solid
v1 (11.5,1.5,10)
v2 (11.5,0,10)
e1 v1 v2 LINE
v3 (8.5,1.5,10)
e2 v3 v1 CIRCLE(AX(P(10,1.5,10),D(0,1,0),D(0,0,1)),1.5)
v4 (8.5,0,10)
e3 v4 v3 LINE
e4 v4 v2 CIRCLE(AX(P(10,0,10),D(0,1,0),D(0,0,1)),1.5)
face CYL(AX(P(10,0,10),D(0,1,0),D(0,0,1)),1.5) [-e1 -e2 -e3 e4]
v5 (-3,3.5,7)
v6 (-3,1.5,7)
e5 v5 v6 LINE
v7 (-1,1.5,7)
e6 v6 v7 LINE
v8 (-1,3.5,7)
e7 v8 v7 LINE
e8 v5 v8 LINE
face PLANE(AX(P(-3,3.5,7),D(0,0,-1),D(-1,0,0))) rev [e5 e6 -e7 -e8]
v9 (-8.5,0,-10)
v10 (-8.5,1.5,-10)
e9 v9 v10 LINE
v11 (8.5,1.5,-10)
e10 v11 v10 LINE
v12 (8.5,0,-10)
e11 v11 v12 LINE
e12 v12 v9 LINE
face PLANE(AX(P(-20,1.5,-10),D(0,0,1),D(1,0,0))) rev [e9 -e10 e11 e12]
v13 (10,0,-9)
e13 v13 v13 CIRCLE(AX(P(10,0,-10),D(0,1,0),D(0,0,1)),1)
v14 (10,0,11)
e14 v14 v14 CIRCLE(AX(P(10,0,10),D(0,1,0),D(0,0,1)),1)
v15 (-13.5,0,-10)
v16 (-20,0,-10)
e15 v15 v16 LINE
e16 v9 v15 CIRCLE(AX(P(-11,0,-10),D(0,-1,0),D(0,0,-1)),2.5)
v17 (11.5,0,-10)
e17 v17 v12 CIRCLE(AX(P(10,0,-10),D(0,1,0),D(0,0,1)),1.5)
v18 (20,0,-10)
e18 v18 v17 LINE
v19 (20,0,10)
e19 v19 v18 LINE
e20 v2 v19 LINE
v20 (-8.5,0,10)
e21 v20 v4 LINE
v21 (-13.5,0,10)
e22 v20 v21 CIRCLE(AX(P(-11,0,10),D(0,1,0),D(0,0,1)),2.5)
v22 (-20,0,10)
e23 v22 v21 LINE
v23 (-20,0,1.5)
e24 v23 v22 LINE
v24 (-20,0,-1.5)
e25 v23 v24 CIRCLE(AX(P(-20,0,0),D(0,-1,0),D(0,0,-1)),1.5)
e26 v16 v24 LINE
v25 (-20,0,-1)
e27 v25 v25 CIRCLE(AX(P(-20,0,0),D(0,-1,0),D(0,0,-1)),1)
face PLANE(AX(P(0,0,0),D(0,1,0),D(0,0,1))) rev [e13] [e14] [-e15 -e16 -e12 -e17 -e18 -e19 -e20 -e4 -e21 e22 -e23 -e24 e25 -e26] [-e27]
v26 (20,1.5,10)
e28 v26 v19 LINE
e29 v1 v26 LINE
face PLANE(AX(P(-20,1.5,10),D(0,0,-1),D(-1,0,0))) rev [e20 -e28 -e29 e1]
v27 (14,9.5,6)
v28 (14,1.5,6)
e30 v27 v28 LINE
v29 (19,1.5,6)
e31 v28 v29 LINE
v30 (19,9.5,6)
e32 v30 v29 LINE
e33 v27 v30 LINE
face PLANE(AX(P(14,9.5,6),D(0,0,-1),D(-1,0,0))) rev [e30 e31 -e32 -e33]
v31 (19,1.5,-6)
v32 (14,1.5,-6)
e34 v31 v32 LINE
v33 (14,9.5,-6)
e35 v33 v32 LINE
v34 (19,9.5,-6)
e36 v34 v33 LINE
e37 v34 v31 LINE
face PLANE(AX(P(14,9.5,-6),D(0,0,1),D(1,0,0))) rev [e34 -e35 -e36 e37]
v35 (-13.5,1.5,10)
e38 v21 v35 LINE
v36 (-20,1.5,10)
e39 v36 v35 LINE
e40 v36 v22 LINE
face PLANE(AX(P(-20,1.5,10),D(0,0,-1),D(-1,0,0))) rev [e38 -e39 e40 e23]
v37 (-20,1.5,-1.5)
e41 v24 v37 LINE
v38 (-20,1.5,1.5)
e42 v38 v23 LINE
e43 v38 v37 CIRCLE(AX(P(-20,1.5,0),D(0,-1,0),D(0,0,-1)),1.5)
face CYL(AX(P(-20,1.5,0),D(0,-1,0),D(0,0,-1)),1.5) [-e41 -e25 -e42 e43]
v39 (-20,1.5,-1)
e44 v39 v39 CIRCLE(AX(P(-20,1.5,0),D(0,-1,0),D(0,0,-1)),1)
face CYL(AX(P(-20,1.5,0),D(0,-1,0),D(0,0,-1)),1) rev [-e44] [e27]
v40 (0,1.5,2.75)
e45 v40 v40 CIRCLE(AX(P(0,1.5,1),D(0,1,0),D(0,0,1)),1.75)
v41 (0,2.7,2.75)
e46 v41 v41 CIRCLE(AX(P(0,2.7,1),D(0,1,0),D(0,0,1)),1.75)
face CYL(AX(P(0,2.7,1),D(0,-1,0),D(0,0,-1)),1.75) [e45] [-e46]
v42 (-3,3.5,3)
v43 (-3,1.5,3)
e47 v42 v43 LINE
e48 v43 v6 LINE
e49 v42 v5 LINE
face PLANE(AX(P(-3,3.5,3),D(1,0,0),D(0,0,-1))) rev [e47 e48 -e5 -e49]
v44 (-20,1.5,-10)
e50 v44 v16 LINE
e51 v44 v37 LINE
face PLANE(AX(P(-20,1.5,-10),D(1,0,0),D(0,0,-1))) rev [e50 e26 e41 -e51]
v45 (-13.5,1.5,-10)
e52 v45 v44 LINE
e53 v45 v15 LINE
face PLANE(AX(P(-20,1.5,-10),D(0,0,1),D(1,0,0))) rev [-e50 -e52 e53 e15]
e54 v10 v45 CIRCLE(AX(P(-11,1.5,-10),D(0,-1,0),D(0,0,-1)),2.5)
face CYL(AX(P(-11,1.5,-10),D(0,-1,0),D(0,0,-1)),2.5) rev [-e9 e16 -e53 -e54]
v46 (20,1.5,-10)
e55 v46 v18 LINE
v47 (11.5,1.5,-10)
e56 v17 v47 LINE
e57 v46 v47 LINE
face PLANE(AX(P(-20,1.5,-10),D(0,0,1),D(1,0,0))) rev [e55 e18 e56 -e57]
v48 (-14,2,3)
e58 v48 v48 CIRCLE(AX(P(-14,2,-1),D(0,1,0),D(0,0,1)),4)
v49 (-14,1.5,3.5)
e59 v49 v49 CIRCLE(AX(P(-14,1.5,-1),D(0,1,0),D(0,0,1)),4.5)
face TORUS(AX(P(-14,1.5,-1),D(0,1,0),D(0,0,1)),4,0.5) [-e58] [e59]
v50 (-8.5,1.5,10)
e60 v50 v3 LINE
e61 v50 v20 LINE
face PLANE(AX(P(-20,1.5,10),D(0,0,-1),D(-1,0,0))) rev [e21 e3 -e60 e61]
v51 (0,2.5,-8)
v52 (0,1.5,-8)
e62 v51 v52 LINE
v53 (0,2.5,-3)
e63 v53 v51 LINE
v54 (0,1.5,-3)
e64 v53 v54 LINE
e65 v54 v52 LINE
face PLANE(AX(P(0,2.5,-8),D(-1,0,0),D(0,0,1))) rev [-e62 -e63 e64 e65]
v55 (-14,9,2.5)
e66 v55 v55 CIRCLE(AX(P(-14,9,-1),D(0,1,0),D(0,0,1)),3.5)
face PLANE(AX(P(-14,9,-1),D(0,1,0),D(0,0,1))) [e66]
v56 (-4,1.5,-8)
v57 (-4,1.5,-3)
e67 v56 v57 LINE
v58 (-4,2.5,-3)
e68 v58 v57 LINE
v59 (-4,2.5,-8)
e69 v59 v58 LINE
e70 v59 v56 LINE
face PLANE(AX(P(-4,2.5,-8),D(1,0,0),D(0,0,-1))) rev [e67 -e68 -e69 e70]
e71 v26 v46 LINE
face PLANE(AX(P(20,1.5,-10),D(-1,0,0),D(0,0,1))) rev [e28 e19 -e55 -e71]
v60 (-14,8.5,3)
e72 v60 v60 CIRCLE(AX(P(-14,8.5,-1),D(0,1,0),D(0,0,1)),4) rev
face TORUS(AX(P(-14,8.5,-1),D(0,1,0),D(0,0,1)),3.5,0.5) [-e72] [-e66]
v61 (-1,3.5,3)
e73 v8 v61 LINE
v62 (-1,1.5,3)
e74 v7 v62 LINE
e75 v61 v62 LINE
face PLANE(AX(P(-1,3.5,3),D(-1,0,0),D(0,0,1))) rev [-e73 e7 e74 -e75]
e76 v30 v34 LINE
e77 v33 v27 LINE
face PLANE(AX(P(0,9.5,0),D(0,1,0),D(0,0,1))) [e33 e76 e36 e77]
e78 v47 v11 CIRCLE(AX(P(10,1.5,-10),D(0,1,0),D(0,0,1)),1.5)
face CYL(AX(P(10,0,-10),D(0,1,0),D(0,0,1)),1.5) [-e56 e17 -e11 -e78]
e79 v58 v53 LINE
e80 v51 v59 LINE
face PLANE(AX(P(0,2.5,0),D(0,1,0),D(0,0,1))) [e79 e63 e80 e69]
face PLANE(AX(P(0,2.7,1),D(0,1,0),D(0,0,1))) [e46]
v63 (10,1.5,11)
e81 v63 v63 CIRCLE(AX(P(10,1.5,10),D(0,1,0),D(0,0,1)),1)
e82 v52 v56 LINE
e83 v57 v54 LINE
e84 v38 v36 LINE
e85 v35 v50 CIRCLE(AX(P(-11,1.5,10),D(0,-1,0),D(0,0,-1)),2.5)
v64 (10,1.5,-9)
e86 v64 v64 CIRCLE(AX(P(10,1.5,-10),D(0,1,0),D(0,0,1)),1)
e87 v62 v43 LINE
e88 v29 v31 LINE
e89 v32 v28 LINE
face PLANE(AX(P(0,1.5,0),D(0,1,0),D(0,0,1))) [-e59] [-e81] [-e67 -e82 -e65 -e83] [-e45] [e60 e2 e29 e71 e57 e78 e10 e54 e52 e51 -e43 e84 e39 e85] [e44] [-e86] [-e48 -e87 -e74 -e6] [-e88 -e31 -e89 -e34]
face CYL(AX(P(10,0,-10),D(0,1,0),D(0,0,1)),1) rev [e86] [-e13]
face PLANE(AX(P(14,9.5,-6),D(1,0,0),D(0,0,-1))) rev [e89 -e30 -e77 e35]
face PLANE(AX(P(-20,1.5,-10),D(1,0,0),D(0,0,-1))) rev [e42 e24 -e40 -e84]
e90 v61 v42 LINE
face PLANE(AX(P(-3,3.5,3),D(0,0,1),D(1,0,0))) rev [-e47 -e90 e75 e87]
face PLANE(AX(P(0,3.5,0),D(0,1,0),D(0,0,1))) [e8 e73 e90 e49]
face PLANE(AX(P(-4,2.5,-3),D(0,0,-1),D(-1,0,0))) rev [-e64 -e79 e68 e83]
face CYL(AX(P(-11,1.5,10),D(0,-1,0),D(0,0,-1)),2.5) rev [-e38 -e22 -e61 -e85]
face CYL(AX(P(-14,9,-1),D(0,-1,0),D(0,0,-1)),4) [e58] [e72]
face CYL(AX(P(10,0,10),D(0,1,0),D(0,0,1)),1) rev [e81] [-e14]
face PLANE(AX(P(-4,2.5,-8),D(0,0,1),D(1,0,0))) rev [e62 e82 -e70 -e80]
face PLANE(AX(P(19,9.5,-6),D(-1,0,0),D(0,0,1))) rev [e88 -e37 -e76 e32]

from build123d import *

# Parameters (mm, degrees)
SKETCH1_W                        = 40
SKETCH1_H                        = 20
PCB_DEPTH                        = 1.5
SKETCH3_R                        = 1.5
TOP_MOUNTING_HOLE_DEPTH          = 1.5
SKETCH4_R                        = 1
TOP_MOUNTING_HOLE_2_DEPTH        = 1.5
SKETCH5_R                        = 2.5
SIDE_INLETS_DEPTH                = 1.5
SKETCH6_R                        = 1.5
SIDE_MOUNTING_HOLE_OUTLINE_DEPTH = 1.5
SKETCH7_R                        = 1
SIDE_MOUNTING_HOLES_DEPTH        = 1.5
SKETCH8_R                        = 4.5
SENSOR_BASE_DEPTH                = 0.5
SKETCH9_R                        = 4
SENSOR_DEPTH                     = 7
SENSOR_FILLET_R                  = 0.5
SKETCH10_W                       = 5
SKETCH10_H                       = 12
CONNECTOR_DEPTH                  = 8
SKETCH11_W                       = 4
SKETCH11_H                       = 5
CHIP_DEPTH                       = 1
SKETCH12_R                       = 1.75
BOSS_EXTRUDE10_DEPTH             = 1.2
SKETCH13_W                       = 2
SKETCH13_H                       = 4
BOSS_EXTRUDE11_DEPTH             = 2


with BuildPart() as part:
    # Sketch1 → PCB (new body)
    with BuildSketch(Plane(origin=(0, 0, 0), x_dir=(1, 0, 0), z_dir=(0, 1, 0))):
        Rectangle(SKETCH1_W, SKETCH1_H)
    extrude(amount=PCB_DEPTH)

    # Sketch3 → Top mounting hole (add)
    with BuildSketch(Plane.XZ):
        with Locations((-20, 0)):
            Circle(SKETCH3_R)
    extrude(amount=-TOP_MOUNTING_HOLE_DEPTH)

    # Sketch4 → Top mounting hole 2 (cut)
    with BuildSketch(Plane.XZ):
        with Locations(Location((-20, 0, 0), (0, 0, 270))):
            Circle(SKETCH4_R)
    extrude(amount=-TOP_MOUNTING_HOLE_2_DEPTH, mode=Mode.SUBTRACT)

    # Sketch5 → Side inlets (cut)
    with BuildSketch(Plane.XZ):
        with Locations((-11, -10)):
            Circle(SKETCH5_R)
        with Locations((-11, 10)):
            Circle(SKETCH5_R)
    extrude(amount=-SIDE_INLETS_DEPTH, mode=Mode.SUBTRACT)

    # Sketch6 → side mounting hole outline (add)
    with BuildSketch(Plane(origin=(0, 1.5, 0), x_dir=(1, 0, 0), z_dir=(0, 1, 0))):
        with Locations((10, 10)):
            Circle(SKETCH6_R)
        with Locations((10, -10)):
            Circle(SKETCH6_R)
    extrude(amount=-SIDE_MOUNTING_HOLE_OUTLINE_DEPTH)

    # Sketch7 → side mounting holes (cut)
    with BuildSketch(Plane(origin=(0, 1.5, 0), x_dir=(1, 0, 0), z_dir=(0, 1, 0))):
        with Locations(Location((10, 10, 0), (0, 0, 270))):
            Circle(SKETCH7_R)
        with Locations(Location((10, -10, 0), (0, 0, 270))):
            Circle(SKETCH7_R)
    extrude(amount=-SIDE_MOUNTING_HOLES_DEPTH, mode=Mode.SUBTRACT)

    # Sketch8 → sensor base (add)
    with BuildSketch(Plane(origin=(0, 1.5, 0), x_dir=(1, 0, 0), z_dir=(0, 1, 0))):
        with Locations(Location((-14, 1, 0), (0, 0, 270))):
            Circle(SKETCH8_R)
    extrude(amount=SENSOR_BASE_DEPTH)

    # Sketch9 → sensor (add)
    with BuildSketch(Plane(origin=(0, 2, 0), x_dir=(1, 0, 0), z_dir=(0, 1, 0))):
        with Locations(Location((-14, 1, 0), (0, 0, 270))):
            Circle(SKETCH9_R)
    extrude(amount=SENSOR_DEPTH)

    # sensor fillet
    sensor_fillet_edges = [part.edges().sort_by_distance(p)[0] for p in [
        (-14, 2, -5.5),
        (-14, 9, -5),
    ]]
    fillet(sensor_fillet_edges, radius=SENSOR_FILLET_R - 0.0001)  # a hair under: the kernel refuses the full size

    # Sketch10 → connector (add)
    with BuildSketch(Plane(origin=(0, 1.5, 0), x_dir=(1, 0, 0), z_dir=(0, 1, 0))):
        with Locations((16.5, 0)):
            Rectangle(SKETCH10_W, SKETCH10_H)
    extrude(amount=CONNECTOR_DEPTH)

    # Sketch11 → chip (add)
    with BuildSketch(Plane(origin=(0, 1.5, 0), x_dir=(1, 0, 0), z_dir=(0, 1, 0))):
        with Locations((-2, 5.5)):
            Rectangle(SKETCH11_W, SKETCH11_H)
    extrude(amount=CHIP_DEPTH)

    # Sketch12 → Boss-Extrude10 (add)
    with BuildSketch(Plane(origin=(0, 1.5, 0), x_dir=(1, 0, 0), z_dir=(0, 1, 0))):
        with Locations(Location((0, -1, 0), (0, 0, 270))):
            Circle(SKETCH12_R)
    extrude(amount=BOSS_EXTRUDE10_DEPTH)

    # Sketch13 → Boss-Extrude11 (add)
    with BuildSketch(Plane(origin=(0, 1.5, 0), x_dir=(1, 0, 0), z_dir=(0, 1, 0))):
        with Locations((-2, -5)):
            Rectangle(SKETCH13_W, SKETCH13_H)
    extrude(amount=BOSS_EXTRUDE11_DEPTH)


solid = part.part
